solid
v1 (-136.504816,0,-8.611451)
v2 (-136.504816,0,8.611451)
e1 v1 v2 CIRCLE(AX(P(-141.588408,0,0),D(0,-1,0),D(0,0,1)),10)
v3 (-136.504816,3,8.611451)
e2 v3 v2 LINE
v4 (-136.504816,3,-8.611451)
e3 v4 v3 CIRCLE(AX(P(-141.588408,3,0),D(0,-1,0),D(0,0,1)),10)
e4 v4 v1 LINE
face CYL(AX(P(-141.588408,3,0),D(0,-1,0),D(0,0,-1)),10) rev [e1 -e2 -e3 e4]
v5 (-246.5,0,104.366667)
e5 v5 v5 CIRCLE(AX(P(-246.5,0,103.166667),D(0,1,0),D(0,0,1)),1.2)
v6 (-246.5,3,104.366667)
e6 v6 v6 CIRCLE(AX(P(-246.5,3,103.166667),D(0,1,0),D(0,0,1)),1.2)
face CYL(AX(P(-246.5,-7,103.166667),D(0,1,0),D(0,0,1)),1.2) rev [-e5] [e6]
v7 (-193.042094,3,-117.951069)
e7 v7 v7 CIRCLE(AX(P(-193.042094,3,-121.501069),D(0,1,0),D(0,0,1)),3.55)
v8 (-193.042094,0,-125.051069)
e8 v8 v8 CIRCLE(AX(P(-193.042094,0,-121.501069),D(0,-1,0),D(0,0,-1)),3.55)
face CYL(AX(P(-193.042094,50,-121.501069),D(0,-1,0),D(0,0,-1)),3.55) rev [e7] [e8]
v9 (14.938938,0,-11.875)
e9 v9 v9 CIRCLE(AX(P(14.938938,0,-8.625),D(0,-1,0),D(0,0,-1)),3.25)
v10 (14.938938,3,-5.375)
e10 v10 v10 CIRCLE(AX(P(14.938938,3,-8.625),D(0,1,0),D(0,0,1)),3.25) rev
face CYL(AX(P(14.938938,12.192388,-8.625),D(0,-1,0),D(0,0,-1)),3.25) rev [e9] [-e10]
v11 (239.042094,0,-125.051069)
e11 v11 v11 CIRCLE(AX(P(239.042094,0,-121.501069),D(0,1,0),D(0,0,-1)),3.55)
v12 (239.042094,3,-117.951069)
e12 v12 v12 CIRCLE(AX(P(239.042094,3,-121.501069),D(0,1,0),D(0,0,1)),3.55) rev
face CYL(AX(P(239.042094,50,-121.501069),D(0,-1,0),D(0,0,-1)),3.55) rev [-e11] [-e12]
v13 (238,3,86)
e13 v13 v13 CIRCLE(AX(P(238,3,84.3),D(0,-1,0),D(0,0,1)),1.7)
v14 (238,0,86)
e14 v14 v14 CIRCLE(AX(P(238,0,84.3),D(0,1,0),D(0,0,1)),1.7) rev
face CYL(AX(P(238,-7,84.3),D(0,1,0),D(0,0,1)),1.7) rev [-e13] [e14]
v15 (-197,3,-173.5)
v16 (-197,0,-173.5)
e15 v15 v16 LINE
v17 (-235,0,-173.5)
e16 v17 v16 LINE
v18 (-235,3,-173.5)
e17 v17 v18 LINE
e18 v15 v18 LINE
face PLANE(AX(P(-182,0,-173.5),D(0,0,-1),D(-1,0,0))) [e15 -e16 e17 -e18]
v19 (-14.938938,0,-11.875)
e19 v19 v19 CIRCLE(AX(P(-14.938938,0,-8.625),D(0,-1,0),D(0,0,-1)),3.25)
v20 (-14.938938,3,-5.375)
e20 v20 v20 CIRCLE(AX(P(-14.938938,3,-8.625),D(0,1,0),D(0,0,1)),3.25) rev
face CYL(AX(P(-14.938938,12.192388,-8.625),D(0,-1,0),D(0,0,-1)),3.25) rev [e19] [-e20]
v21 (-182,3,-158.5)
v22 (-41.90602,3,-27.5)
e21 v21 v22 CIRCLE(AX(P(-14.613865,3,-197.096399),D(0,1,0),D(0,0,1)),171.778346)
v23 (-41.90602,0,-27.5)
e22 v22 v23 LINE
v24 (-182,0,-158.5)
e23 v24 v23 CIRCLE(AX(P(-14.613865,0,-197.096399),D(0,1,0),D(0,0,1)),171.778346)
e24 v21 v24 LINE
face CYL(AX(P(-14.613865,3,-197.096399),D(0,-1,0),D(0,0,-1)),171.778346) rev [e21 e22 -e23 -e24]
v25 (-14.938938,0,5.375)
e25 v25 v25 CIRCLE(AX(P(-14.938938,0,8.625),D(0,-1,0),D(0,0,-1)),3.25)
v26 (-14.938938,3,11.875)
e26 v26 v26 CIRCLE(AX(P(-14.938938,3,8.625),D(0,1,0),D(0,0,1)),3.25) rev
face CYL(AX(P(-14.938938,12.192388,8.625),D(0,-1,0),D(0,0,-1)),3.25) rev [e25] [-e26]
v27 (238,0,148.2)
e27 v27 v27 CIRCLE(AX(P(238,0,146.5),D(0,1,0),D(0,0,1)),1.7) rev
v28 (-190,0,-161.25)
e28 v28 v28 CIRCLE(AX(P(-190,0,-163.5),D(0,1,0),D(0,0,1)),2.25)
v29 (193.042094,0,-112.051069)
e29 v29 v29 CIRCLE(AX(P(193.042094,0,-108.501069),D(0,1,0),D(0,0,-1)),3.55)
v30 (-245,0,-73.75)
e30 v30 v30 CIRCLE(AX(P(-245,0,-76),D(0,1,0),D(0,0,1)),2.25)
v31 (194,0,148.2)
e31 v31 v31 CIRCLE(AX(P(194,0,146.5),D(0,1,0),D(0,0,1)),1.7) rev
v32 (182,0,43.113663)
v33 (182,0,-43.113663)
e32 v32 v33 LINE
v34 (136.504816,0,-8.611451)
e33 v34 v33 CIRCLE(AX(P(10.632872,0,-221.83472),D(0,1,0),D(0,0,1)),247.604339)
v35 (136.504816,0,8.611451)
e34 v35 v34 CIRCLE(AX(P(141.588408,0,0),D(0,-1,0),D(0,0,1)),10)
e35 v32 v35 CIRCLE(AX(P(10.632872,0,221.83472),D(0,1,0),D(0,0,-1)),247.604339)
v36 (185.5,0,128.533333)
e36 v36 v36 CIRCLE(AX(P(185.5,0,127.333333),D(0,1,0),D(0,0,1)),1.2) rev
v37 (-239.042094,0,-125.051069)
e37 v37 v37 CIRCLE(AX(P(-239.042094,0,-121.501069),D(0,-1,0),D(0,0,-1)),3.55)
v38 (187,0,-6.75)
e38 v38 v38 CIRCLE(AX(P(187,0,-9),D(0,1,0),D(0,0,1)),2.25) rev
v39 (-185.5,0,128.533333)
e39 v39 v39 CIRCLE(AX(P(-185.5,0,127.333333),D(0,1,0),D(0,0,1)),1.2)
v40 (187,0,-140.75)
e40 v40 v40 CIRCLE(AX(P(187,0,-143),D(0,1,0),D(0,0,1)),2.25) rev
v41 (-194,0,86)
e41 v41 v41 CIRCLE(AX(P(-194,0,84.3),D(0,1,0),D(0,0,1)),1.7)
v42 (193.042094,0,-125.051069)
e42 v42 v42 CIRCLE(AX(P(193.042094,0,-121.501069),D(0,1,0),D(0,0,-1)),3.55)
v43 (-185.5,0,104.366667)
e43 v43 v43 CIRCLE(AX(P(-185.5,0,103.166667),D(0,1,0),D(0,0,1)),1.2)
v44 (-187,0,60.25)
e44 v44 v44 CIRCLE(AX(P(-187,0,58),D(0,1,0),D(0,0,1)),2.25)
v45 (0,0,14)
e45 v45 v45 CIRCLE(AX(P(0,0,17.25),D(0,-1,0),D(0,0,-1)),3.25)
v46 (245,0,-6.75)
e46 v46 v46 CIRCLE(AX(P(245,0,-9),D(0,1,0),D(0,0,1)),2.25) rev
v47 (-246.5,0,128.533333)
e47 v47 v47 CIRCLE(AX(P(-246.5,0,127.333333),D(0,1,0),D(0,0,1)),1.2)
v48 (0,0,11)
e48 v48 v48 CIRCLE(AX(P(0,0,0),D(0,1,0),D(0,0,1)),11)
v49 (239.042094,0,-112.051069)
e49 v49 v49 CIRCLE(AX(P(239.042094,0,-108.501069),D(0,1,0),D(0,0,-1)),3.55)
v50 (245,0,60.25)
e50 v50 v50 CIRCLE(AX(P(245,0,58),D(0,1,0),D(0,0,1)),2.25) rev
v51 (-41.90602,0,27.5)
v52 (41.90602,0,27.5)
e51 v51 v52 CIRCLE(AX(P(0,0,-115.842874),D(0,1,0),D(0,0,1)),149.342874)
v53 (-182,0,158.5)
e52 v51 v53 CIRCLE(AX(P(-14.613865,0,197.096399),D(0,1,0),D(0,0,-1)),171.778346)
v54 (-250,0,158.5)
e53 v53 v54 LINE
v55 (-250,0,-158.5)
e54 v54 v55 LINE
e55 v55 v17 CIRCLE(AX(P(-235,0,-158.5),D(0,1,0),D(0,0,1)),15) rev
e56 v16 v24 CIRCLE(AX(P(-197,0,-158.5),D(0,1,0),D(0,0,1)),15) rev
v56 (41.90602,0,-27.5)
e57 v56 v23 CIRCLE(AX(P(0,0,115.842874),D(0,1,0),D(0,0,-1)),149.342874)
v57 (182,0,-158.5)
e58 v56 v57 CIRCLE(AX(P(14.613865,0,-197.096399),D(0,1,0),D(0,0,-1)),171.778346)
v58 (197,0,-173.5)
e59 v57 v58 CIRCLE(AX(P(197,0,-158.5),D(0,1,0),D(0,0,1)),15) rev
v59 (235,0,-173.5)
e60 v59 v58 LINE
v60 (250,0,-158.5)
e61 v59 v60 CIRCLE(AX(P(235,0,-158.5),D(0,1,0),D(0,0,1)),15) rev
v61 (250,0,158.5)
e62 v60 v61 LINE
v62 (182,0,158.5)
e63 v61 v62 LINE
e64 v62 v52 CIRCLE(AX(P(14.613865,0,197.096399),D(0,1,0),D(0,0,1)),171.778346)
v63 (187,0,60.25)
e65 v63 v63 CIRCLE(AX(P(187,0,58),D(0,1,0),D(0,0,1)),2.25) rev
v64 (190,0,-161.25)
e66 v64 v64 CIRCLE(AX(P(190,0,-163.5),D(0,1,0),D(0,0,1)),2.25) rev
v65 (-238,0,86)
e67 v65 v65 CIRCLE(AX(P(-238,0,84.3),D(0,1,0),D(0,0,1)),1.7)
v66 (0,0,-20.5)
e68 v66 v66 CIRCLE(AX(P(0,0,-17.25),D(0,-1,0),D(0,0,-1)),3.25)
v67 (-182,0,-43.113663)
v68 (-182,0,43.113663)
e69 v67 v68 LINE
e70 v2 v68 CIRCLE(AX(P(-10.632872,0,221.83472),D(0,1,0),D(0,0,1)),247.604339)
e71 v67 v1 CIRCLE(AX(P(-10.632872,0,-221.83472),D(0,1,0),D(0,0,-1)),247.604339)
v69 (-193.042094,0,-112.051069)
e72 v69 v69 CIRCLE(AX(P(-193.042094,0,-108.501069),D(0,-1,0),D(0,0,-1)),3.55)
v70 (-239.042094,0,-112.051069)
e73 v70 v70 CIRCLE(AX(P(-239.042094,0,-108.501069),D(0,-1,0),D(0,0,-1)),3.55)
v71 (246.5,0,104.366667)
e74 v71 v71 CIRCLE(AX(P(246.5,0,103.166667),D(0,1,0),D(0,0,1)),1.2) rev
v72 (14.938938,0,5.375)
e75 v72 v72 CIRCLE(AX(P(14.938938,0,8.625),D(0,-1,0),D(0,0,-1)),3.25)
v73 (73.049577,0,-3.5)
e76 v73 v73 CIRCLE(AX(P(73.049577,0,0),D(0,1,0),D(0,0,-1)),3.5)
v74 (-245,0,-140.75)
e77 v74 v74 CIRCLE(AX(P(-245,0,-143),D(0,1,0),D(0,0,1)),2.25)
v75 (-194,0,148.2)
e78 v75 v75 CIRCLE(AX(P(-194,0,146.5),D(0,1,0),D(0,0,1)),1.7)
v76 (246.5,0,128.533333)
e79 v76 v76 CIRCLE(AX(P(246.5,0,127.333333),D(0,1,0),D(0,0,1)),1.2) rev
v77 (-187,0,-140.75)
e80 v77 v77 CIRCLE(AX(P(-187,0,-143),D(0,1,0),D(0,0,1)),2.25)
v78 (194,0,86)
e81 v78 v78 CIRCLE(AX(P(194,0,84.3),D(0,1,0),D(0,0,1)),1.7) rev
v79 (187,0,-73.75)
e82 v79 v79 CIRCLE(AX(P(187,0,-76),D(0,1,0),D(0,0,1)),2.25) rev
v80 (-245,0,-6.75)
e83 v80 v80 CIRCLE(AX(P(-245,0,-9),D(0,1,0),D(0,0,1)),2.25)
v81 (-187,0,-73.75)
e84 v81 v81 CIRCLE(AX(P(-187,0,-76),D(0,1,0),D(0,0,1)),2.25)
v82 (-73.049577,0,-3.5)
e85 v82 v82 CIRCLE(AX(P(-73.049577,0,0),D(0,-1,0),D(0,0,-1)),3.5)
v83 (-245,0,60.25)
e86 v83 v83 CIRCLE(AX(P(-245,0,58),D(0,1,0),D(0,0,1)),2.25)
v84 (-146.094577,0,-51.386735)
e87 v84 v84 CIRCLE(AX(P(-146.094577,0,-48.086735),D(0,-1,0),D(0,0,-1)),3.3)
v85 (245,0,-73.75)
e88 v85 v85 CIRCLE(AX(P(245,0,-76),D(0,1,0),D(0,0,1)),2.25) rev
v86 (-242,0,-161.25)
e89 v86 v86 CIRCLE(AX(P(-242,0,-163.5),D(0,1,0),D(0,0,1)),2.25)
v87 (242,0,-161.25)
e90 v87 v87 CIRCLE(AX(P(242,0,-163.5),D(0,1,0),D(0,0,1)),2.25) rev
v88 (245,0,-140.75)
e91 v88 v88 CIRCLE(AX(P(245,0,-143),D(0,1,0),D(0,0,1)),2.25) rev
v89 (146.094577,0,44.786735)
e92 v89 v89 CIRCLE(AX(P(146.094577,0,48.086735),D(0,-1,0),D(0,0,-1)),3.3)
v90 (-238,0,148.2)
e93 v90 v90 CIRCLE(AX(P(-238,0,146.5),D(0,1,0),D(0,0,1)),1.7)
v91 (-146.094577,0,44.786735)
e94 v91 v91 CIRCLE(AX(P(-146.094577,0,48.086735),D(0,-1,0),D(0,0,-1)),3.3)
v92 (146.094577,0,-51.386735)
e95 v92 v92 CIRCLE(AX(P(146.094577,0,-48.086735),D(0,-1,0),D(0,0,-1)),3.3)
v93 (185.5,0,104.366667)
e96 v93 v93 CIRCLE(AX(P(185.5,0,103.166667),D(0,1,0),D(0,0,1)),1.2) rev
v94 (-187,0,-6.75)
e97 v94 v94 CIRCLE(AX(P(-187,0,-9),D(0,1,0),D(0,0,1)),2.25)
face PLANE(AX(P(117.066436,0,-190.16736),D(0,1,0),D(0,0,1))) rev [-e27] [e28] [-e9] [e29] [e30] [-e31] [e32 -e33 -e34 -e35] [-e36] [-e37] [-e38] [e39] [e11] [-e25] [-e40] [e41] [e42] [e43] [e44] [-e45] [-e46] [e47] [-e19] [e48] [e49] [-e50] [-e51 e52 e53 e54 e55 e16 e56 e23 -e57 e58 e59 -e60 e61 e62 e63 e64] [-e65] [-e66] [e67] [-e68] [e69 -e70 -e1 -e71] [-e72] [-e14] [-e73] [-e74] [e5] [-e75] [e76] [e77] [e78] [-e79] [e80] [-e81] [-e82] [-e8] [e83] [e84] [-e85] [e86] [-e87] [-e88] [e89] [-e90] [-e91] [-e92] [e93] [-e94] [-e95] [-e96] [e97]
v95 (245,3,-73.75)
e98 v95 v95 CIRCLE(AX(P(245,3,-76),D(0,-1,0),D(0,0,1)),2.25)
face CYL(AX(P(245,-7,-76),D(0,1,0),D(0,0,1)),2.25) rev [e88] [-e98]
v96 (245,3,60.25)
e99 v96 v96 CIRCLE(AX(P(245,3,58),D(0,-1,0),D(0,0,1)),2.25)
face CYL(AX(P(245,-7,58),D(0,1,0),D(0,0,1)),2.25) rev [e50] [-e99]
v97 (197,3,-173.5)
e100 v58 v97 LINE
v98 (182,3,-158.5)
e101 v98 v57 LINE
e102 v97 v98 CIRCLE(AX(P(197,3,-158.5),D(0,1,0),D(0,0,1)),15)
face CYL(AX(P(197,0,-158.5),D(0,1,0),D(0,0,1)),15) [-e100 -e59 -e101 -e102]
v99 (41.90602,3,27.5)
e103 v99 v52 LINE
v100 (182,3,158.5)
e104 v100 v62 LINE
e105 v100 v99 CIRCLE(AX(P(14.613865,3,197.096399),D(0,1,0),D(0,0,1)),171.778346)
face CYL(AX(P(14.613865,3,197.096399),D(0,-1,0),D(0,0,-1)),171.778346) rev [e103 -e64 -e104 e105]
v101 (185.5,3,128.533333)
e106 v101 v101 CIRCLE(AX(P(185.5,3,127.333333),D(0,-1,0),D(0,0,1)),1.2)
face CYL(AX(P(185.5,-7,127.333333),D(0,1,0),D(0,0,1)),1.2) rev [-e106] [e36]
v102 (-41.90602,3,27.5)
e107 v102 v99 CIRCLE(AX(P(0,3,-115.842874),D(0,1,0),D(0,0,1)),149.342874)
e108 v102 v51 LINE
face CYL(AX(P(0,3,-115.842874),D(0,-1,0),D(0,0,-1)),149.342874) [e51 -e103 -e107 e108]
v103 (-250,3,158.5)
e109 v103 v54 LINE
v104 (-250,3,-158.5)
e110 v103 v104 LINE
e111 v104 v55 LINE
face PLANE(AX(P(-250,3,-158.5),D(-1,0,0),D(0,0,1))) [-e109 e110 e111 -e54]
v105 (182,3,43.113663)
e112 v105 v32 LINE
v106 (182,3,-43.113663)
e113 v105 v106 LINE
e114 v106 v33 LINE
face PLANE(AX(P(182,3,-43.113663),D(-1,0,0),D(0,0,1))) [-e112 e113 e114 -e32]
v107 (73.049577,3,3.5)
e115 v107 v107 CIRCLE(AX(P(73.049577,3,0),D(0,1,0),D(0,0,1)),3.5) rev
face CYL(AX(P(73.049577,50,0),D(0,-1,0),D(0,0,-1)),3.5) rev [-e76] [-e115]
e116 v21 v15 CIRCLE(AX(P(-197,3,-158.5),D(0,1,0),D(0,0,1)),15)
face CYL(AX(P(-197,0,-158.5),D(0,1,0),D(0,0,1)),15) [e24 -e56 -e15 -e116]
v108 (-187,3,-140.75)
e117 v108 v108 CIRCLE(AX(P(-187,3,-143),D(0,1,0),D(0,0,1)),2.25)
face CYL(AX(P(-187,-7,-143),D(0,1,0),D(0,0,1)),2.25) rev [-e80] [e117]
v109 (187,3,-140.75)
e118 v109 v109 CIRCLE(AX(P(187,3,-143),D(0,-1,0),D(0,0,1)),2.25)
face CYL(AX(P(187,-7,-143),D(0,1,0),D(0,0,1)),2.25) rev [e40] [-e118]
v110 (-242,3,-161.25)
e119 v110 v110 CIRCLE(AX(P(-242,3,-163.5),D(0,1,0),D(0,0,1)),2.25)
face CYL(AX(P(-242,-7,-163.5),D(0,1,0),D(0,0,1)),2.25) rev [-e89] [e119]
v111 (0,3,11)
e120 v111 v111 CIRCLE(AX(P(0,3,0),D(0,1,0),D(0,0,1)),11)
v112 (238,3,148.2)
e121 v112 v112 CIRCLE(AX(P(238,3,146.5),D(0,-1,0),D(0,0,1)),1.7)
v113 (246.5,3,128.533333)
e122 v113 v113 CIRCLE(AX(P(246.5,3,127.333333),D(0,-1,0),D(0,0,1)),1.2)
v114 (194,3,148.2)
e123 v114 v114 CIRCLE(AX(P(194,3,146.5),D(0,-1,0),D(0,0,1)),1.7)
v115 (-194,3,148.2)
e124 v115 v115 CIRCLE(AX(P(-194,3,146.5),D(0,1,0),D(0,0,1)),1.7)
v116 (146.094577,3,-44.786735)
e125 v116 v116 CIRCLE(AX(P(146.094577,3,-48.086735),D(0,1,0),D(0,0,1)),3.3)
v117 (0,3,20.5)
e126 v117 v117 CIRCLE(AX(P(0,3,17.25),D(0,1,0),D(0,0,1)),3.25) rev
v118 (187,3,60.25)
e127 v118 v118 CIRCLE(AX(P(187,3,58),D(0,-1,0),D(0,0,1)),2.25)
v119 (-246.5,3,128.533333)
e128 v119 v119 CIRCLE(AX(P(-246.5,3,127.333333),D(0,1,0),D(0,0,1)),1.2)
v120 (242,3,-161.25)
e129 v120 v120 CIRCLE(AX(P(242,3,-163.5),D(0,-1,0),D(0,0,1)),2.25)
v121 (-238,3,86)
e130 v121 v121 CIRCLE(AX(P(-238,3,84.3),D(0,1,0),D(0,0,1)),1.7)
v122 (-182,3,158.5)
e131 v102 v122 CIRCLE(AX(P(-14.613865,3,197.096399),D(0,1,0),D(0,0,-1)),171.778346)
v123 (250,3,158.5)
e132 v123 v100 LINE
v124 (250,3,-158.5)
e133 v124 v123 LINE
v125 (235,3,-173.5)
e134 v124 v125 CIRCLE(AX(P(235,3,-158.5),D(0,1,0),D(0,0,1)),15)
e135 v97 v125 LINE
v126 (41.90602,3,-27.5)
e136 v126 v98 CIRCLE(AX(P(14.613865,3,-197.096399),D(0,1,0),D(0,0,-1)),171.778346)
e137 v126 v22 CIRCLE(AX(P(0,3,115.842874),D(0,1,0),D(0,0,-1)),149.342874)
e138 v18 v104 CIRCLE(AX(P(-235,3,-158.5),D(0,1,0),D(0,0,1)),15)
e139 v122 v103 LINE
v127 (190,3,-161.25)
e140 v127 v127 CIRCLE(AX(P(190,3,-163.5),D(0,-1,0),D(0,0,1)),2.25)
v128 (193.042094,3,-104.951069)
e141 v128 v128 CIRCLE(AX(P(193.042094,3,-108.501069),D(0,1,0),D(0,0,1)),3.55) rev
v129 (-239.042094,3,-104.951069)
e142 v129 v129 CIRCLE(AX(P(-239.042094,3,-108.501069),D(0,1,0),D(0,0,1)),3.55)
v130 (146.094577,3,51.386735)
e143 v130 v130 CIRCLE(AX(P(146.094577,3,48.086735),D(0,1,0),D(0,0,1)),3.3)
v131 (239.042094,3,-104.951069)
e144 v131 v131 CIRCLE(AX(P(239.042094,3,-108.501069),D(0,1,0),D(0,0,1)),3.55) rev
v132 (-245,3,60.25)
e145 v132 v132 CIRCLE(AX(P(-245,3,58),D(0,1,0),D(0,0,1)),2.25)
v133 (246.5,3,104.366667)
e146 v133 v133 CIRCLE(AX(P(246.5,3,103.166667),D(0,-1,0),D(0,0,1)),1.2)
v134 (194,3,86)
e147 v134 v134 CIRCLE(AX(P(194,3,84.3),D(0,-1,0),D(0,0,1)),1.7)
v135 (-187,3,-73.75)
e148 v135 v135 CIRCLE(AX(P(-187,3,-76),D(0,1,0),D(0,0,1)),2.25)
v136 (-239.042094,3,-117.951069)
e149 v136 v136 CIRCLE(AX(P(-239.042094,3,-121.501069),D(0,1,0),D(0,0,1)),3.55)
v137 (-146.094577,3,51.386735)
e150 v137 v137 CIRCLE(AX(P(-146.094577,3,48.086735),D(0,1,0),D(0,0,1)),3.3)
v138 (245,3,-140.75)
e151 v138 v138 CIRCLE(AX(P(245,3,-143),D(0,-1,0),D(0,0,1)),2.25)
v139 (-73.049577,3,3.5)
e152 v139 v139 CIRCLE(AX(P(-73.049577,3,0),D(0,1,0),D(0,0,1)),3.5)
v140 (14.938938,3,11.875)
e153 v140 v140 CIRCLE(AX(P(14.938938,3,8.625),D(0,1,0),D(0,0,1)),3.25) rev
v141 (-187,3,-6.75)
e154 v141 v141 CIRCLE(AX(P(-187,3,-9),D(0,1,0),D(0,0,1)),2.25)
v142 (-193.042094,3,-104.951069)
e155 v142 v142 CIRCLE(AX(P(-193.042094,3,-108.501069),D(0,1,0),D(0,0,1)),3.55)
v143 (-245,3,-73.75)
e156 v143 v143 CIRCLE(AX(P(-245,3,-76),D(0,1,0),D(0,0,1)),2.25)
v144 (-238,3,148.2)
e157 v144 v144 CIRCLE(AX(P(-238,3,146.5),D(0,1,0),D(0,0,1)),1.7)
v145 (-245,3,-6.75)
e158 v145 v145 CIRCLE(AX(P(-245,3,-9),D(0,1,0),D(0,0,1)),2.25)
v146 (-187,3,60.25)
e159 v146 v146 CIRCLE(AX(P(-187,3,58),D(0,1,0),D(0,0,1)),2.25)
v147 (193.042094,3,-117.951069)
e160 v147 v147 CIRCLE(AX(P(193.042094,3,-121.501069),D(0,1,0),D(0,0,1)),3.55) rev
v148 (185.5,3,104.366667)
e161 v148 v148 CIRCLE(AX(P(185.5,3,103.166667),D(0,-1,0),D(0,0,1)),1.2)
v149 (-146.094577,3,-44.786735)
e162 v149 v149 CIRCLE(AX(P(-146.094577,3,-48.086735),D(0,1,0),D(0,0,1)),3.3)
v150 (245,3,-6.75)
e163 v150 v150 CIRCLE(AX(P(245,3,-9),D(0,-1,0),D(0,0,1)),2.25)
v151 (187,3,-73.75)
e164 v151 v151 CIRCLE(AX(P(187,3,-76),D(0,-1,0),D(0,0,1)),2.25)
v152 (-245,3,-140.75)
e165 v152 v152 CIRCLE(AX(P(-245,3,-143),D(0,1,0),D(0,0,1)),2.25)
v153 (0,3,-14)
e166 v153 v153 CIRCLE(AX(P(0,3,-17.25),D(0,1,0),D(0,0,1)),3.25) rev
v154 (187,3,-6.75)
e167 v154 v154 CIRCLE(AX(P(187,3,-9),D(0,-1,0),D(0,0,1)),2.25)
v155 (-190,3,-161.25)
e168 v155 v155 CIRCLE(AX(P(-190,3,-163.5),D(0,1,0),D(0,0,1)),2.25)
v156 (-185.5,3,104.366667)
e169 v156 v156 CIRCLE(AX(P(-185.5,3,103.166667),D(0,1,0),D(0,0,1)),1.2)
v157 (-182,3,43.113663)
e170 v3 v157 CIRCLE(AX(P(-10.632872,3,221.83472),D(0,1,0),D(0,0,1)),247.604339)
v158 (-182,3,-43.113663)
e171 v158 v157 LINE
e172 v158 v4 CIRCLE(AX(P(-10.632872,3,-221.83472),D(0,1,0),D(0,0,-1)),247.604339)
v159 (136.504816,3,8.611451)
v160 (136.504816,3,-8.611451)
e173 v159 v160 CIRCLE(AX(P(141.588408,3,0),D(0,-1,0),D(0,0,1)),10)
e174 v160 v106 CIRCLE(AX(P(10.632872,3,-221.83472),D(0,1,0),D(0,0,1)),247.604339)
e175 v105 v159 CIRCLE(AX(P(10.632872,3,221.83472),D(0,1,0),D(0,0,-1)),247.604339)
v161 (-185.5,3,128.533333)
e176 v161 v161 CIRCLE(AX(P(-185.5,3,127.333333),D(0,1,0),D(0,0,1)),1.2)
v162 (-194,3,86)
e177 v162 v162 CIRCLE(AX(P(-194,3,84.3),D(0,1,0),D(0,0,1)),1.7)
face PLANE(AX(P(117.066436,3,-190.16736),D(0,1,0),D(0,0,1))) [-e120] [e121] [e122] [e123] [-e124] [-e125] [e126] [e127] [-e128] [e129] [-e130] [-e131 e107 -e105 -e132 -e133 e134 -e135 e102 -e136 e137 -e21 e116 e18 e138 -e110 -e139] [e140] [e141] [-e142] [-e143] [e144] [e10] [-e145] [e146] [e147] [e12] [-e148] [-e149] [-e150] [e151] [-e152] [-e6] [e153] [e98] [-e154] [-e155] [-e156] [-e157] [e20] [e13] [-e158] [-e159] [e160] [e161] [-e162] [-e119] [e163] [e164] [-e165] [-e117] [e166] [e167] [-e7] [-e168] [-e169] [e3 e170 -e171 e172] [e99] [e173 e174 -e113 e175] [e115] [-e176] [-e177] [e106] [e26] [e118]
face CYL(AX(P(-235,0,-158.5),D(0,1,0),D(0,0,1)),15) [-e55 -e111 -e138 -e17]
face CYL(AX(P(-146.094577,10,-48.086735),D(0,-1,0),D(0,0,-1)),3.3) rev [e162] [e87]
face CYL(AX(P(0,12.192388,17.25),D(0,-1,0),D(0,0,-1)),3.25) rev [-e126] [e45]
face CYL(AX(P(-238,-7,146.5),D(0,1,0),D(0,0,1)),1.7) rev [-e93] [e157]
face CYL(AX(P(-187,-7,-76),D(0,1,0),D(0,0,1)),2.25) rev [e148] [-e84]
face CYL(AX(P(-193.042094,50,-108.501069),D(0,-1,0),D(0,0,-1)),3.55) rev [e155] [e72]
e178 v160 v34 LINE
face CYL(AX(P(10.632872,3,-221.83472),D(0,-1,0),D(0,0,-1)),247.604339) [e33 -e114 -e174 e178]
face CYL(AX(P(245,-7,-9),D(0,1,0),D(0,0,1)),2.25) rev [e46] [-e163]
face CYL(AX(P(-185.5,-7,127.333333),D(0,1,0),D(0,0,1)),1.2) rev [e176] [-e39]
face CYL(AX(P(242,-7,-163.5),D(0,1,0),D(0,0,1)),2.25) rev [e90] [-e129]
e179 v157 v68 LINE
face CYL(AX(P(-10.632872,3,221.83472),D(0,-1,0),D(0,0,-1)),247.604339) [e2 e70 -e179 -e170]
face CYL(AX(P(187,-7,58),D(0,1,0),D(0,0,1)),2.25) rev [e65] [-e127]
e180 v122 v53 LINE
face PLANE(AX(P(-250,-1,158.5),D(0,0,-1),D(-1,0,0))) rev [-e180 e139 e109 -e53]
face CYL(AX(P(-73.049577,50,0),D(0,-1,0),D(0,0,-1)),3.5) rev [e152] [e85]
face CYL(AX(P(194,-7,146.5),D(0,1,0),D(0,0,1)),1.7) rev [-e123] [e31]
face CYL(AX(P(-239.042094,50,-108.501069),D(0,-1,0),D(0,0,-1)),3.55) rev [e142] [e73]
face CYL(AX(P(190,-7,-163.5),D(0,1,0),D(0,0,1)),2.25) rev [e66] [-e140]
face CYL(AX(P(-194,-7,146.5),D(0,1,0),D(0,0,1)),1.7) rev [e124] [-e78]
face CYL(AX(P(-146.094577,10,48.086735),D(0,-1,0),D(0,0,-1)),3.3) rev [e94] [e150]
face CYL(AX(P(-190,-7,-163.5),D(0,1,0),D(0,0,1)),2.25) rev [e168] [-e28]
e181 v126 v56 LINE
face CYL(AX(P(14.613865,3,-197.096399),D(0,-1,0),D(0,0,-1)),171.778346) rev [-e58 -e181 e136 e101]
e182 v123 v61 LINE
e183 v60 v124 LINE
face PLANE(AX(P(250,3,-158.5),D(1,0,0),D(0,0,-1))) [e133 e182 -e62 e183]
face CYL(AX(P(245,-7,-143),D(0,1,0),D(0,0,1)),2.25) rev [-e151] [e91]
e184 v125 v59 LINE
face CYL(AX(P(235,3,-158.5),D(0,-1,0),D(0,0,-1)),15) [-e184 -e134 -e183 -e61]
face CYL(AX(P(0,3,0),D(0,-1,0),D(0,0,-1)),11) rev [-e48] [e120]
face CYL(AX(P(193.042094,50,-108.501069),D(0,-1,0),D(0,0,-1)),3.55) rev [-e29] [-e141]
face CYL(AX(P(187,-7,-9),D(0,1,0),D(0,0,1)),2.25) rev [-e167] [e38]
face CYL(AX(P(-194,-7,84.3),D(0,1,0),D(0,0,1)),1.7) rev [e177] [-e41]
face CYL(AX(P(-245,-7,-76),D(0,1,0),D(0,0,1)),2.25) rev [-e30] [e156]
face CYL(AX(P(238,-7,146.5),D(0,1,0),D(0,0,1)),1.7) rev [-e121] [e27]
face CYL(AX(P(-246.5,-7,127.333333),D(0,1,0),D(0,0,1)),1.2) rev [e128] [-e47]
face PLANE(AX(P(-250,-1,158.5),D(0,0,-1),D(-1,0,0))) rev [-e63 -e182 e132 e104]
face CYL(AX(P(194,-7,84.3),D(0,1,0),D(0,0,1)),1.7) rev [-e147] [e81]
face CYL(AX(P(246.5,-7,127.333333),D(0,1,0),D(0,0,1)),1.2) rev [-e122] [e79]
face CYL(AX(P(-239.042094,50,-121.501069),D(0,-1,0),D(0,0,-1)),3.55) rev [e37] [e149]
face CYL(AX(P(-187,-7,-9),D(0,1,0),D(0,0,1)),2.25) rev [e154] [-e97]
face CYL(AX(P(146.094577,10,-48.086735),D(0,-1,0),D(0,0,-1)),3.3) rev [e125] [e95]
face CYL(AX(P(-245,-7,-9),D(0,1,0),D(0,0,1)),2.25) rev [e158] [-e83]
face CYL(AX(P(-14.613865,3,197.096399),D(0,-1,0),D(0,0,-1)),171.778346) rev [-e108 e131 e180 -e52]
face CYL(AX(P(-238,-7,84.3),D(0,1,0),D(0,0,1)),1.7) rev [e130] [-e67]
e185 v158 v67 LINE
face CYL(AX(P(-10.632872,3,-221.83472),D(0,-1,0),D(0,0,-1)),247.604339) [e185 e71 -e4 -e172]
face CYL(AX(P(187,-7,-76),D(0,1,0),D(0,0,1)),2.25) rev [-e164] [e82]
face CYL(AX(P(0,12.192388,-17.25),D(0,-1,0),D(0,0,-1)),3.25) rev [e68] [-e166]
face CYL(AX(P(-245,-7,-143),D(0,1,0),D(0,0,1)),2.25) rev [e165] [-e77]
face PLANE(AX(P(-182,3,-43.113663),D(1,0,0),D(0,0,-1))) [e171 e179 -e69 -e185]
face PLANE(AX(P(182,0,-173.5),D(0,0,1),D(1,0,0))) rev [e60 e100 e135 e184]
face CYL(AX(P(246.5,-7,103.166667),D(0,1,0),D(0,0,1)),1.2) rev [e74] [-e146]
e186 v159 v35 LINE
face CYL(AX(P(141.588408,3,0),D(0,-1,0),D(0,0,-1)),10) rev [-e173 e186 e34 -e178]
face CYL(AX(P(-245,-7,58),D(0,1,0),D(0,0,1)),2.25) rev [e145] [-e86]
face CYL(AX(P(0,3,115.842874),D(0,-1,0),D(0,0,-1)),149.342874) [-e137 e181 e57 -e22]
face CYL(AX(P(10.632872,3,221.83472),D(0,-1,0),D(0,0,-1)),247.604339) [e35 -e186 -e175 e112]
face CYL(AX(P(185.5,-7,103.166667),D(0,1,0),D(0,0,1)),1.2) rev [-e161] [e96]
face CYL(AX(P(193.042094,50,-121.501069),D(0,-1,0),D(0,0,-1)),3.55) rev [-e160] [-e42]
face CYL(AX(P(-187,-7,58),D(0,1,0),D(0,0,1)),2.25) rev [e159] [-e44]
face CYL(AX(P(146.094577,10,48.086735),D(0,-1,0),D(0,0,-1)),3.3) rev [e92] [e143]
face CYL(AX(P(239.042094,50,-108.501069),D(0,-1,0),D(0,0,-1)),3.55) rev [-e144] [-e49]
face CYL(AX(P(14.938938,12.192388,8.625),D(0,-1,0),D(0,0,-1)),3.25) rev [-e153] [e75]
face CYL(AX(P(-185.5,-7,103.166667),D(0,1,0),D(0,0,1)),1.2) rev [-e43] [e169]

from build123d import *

# Parameters (mm, degrees)
SKETCH1_R           = 6.35
SKETCH1_R_2         = 11
BOSS_EXTRUDE1_DEPTH = 3
SKETCH3_W           = 515.59682947
SKETCH3_H           = 41.835114591
SKETCH3_H_2         = 39.78804392
CUT_EXTRUDE1_DEPTH  = 4
BOSS_EXTRUDE2_DEPTH = 3
BOSS_EXTRUDE3_DEPTH = 3
FILLET3_R           = 15
SKETCH13_R          = 1.2
SKETCH13_R_2        = 2.25
CUT_EXTRUDE2_DEPTH  = 10
SKETCH14_R          = 1.7
CUT_EXTRUDE3_DEPTH  = 10
BOSS_EXTRUDE5_START = -3
SKETCH16_R          = 6.35
BOSS_EXTRUDE5_DEPTH = 3
SKETCH17_R          = 2.5
CUT_EXTRUDE4_DEPTH  = 10
SKETCH18_R          = 6.35
BOSS_EXTRUDE6_DEPTH = 3
SKETCH19_R          = 3.3
CUT_EXTRUDE5_DEPTH  = 10
SKETCH20_R          = 3.55
CUT_EXTRUDE6_DEPTH  = 50
SKETCH21_R          = 3.5
CUT_EXTRUDE7_DEPTH  = 50
BOSS_EXTRUDE7_START = -3
SKETCH22_R          = 2.5
BOSS_EXTRUDE7_DEPTH = 3
SKETCH23_R          = 3.25
CUT_EXTRUDE8_DEPTH  = 3


with BuildPart() as part:
    # Sketch1 → Boss-Extrude1 (new body)
    with BuildSketch(Plane(origin=(0, 0, 0), x_dir=(1, 0, 0), z_dir=(0, 1, 0))):
        with BuildLine():
            ThreePointArc((-41.906019658, -27.5), (-137.644967441, -71.462113616), (-197, -158.5))
            ThreePointArc((-197, -158.5), (-223.5, -185), (-250, -158.5))
            ThreePointArc((-250, -158.5), (-208.03231281, -72.364423731), (-136.504816256, -8.61145122))
            ThreePointArc((-136.504816256, -8.61145122), (-131.588408281, 0), (-136.504816256, 8.61145122))
            ThreePointArc((-136.504816256, 8.61145122), (-208.03231281, 72.364423731), (-250, 158.5))
            ThreePointArc((-250, 158.5), (-223.5, 185), (-197, 158.5))
            ThreePointArc((-197, 158.5), (-137.644967441, 71.462113616), (-41.906019658, 27.5))
            ThreePointArc((-41.906019658, 27.5), (0, 33.5), (41.906019658, 27.5))
            ThreePointArc((41.906019658, 27.5), (137.644967441, 71.462113616), (197, 158.5))
            ThreePointArc((197, 158.5), (223.5, 185), (250, 158.5))
            ThreePointArc((250, 158.5), (208.03231281, 72.364423731), (136.504816256, 8.61145122))
            ThreePointArc((136.504816256, 8.61145122), (131.588408281, 0), (136.504816256, -8.61145122))
            ThreePointArc((136.504816256, -8.61145122), (208.03231281, -72.364423731), (250, -158.5))
            ThreePointArc((250, -158.5), (223.5, -185), (197, -158.5))
            ThreePointArc((197, -158.5), (137.644967441, -71.462113616), (41.906019658, -27.5))
            ThreePointArc((41.906019658, -27.5), (0, -33.5), (-41.906019658, -27.5))
        make_face()
        with Locations(Location((39.6, 0, 0), (0, 0, 270))):
            Circle(SKETCH1_R, mode=Mode.SUBTRACT)
        with Locations(Location((-39.6, 0, 0), (0, 0, 90))):
            Circle(SKETCH1_R, mode=Mode.SUBTRACT)
        with Locations(Location((0, 0, 0), (0, 0, 270))):
            Circle(SKETCH1_R_2, mode=Mode.SUBTRACT)
    extrude(amount=BOSS_EXTRUDE1_DEPTH)

    # Sketch3 → Cut-Extrude1 (cut)
    with BuildSketch(Plane(origin=(0, 3, 0), x_dir=(1, 0, 0), z_dir=(0, 1, 0))):
        with Locations((7.798414735, 179.417557295)):
            Rectangle(SKETCH3_W, SKETCH3_H)
        with Locations((7.798414735, -178.39402196)):
            Rectangle(SKETCH3_W, SKETCH3_H_2)
    extrude(amount=-CUT_EXTRUDE1_DEPTH, mode=Mode.SUBTRACT)

    # Sketch8 → Boss-Extrude2 (add)
    with BuildSketch(Plane.XZ):
        with BuildLine():
            Line((-250, -158.5), (-250, 158.5))
            ThreePointArc((-250, 158.5), (-223.949910555, 96.121754218), (-182, 43.113663219))
            Line((-182, 43.113663219), (-182, -43.113663219))
            ThreePointArc((-182, -43.113663219), (-223.949910555, -96.121754218), (-250, -158.5))
        make_face()
        with BuildLine():
            Line((-197, -158.5), (-182, -158.5))
            ThreePointArc((-182, -158.5), (-131.938879854, -71.626716928), (-41.906019658, -27.5))
            ThreePointArc((-41.906019658, -27.5), (-137.644967441, -71.462113616), (-197, -158.5))
        make_face()
        with BuildLine():
            Line((250, -158.5), (250, 158.5))
            ThreePointArc((250, 158.5), (223.949910555, 96.121754218), (182, 43.113663219))
            Line((182, 43.113663219), (182, -43.113663219))
            ThreePointArc((182, -43.113663219), (223.949910555, -96.121754218), (250, -158.5))
        make_face()
        with BuildLine():
            Line((-197, 158.5), (-182, 158.5))
            ThreePointArc((-182, 158.5), (-131.938879854, 71.626716928), (-41.906019658, 27.5))
            ThreePointArc((-41.906019658, 27.5), (-137.644967441, 71.462113616), (-197, 158.5))
        make_face()
        with BuildLine():
            Line((197, 158.5), (182, 158.5))
            ThreePointArc((182, 158.5), (131.938879854, 71.626716928), (41.906019658, 27.5))
            ThreePointArc((41.906019658, 27.5), (137.644967441, 71.462113616), (197, 158.5))
        make_face()
        with BuildLine():
            Line((197, -158.5), (182, -158.5))
            ThreePointArc((182, -158.5), (131.938879854, -71.626716928), (41.906019658, -27.5))
            ThreePointArc((41.906019658, -27.5), (137.644967441, -71.462113616), (197, -158.5))
        make_face()
    extrude(amount=-BOSS_EXTRUDE2_DEPTH)

    # Sketch11 → Boss-Extrude3 (add)
    with BuildSketch(Plane(origin=(0, 3, 0), x_dir=(1, 0, 0), z_dir=(0, 1, 0))):
        Polygon((250, 158.5), (250, 173.5), (184.763828731, 173.5), (182, 173.5), (182, 158.5), align=None)
        Polygon((-182, 173.5), (-184.763828731, 173.5), (-250, 173.5), (-250, 158.5), (-182, 158.5), align=None)
    extrude(amount=-BOSS_EXTRUDE3_DEPTH)

    # Fillet3
    fillet3_edges = [part.edges().sort_by_distance(p)[0] for p in [
        (250, 1.5, -173.5),
        (182, 1.5, -173.5),
        (-182, 1.5, -173.5),
        (-250, 1.5, -173.5),
    ]]
    fillet(fillet3_edges, radius=FILLET3_R - 0.0001)  # a hair under: the kernel refuses the full size

    # Sketch13 → Cut-Extrude2 (cut)
    with BuildSketch(Plane(origin=(0, 3, 0), x_dir=(1, 0, 0), z_dir=(0, 1, 0))):
        with Locations(Location((-185.5, -127.333333333, 0), (0, 0, 270))):
            Circle(SKETCH13_R)
        with Locations(Location((-185.5, -103.166666667, 0), (0, 0, 270))):
            Circle(SKETCH13_R)
        with Locations(Location((-246.5, -103.166666667, 0), (0, 0, 270))):
            Circle(SKETCH13_R)
        with Locations(Location((-246.5, -127.333333333, 0), (0, 0, 270))):
            Circle(SKETCH13_R)
        with Locations(Location((-187, -58, 0), (0, 0, 270))):
            Circle(SKETCH13_R_2)
        with Locations(Location((-187, 9, 0), (0, 0, 270))):
            Circle(SKETCH13_R_2)
        with Locations(Location((-187, 76, 0), (0, 0, 270))):
            Circle(SKETCH13_R_2)
        with Locations(Location((-187, 143, 0), (0, 0, 270))):
            Circle(SKETCH13_R_2)
        with Locations(Location((-245, 143, 0), (0, 0, 270))):
            Circle(SKETCH13_R_2)
        with Locations(Location((-245, 76, 0), (0, 0, 270))):
            Circle(SKETCH13_R_2)
        with Locations(Location((-245, 9, 0), (0, 0, 270))):
            Circle(SKETCH13_R_2)
        with Locations(Location((-245, -58, 0), (0, 0, 270))):
            Circle(SKETCH13_R_2)
        with Locations(Location((-242, 163.5, 0), (0, 0, 270))):
            Circle(SKETCH13_R_2)
        with Locations(Location((-190, 163.5, 0), (0, 0, 270))):
            Circle(SKETCH13_R_2)
    cut_extrude2 = extrude(amount=-CUT_EXTRUDE2_DEPTH, mode=Mode.SUBTRACT)

    # Sketch14 → Cut-Extrude3 (cut)
    with BuildSketch(Plane(origin=(0, 3, 0), x_dir=(1, 0, 0), z_dir=(0, 1, 0))):
        with Locations(Location((-194, -146.5, 0), (0, 0, 270))):
            Circle(SKETCH14_R)
        with Locations(Location((-238, -146.5, 0), (0, 0, 270))):
            Circle(SKETCH14_R)
        with Locations(Location((-194, -84.3, 0), (0, 0, 270))):
            Circle(SKETCH14_R)
        with Locations(Location((-238, -84.3, 0), (0, 0, 270))):
            Circle(SKETCH14_R)
    cut_extrude3 = extrude(amount=-CUT_EXTRUDE3_DEPTH, mode=Mode.SUBTRACT)

    # Mirror4: Cut-Extrude2, Cut-Extrude3 across plane
    add(cut_extrude2.mirror(Plane(origin=(0, 0, 0), x_dir=(0, 0, 1), z_dir=(1, 0, 0))), mode=Mode.SUBTRACT)
    add(cut_extrude3.mirror(Plane(origin=(0, 0, 0), x_dir=(0, 0, 1), z_dir=(1, 0, 0))), mode=Mode.SUBTRACT)

    # Sketch16 → Boss-Extrude5 (add)
    with BuildSketch(Plane(origin=(0, 3, 0), x_dir=(1, 0, 0), z_dir=(0, 1, 0)).offset(BOSS_EXTRUDE5_START)):
        with Locations((-39.6, 0)):
            Circle(SKETCH16_R)
        with Locations((39.6, 0)):
            Circle(SKETCH16_R)
    extrude(amount=BOSS_EXTRUDE5_DEPTH)

    # Sketch17 → Cut-Extrude4 (cut)
    with BuildSketch(Plane(origin=(0, 3, 0), x_dir=(1, 0, 0), z_dir=(0, 1, 0))):
        with Locations(Location((0, 19, 0), (0, 0, 270))):
            Circle(SKETCH17_R)
        with Locations(Location((19, 0, 0), (0, 0, 270))):
            Circle(SKETCH17_R)
        with Locations(Location((0, -19, 0), (0, 0, 270))):
            Circle(SKETCH17_R)
        with Locations(Location((-19, 0, 0), (0, 0, 270))):
            Circle(SKETCH17_R)
    extrude(amount=-CUT_EXTRUDE4_DEPTH, mode=Mode.SUBTRACT)

    # Sketch18 → Boss-Extrude6 (add)
    with BuildSketch(Plane.XZ):
        with Locations((-39.6, 0)):
            Circle(SKETCH18_R)
        with Locations((39.6, 0)):
            Circle(SKETCH18_R)
    extrude(amount=-BOSS_EXTRUDE6_DEPTH)

    # Sketch19 → Cut-Extrude5 (cut)
    with BuildSketch(Plane.XZ):
        with Locations(Location((-146.094577254, 48.086735474, 0), (0, 0, 270))):
            Circle(SKETCH19_R)
        with Locations(Location((146.094577254, 48.086735474, 0), (0, 0, 270))):
            Circle(SKETCH19_R)
        with Locations(Location((146.094577254, -48.086735474, 0), (0, 0, 270))):
            Circle(SKETCH19_R)
        with Locations(Location((-146.094577254, -48.086735474, 0), (0, 0, 270))):
            Circle(SKETCH19_R)
    extrude(amount=-CUT_EXTRUDE5_DEPTH, mode=Mode.SUBTRACT)

    # Sketch20 → Cut-Extrude6 (cut)
    with BuildSketch(Plane.XZ):
        with Locations(Location((-239.042094399, -108.501069067, 0), (0, 0, 270))):
            Circle(SKETCH20_R)
        with Locations(Location((-239.042094399, -121.501069067, 0), (0, 0, 270))):
            Circle(SKETCH20_R)
        with Locations(Location((-193.042094399, -108.501069067, 0), (0, 0, 270))):
            Circle(SKETCH20_R)
        with Locations(Location((-193.042094399, -121.501069067, 0), (0, 0, 270))):
            Circle(SKETCH20_R)
    cut_extrude6 = extrude(amount=-CUT_EXTRUDE6_DEPTH, mode=Mode.SUBTRACT)

    # Mirror5: Cut-Extrude6 across plane
    add(cut_extrude6.mirror(Plane(origin=(0, 0, 0), x_dir=(0, 0, 1), z_dir=(1, 0, 0))), mode=Mode.SUBTRACT)

    # Sketch21 → Cut-Extrude7 (cut)
    with BuildSketch(Plane.XZ):
        with Locations(Location((-73.049577254, 0, 0), (0, 0, 270))):
            Circle(SKETCH21_R)
    cut_extrude7 = extrude(amount=-CUT_EXTRUDE7_DEPTH, mode=Mode.SUBTRACT)

    # Mirror6: Cut-Extrude7 across plane
    add(cut_extrude7.mirror(Plane(origin=(0, 0, 0), x_dir=(0, 0, 1), z_dir=(1, 0, 0))), mode=Mode.SUBTRACT)

    # Sketch22 → Boss-Extrude7 (add)
    with BuildSketch(Plane.XZ.offset(BOSS_EXTRUDE7_START)):
        with Locations((0, -19)):
            Circle(SKETCH22_R)
        with Locations((-19, 0)):
            Circle(SKETCH22_R)
        with Locations((0, 19)):
            Circle(SKETCH22_R)
        with Locations((19, 0)):
            Circle(SKETCH22_R)
    extrude(amount=BOSS_EXTRUDE7_DEPTH)

    # Sketch23 → Cut-Extrude8 (cut)
    with BuildSketch(Plane.XZ):
        with Locations(Location((0, 17.25, 0), (0, 0, 270))):
            Circle(SKETCH23_R)
        with Locations(Location((14.938938215, 8.625, 0), (0, 0, 270))):
            Circle(SKETCH23_R)
        with Locations(Location((14.938938215, -8.625, 0), (0, 0, 270))):
            Circle(SKETCH23_R)
        with Locations(Location((0, -17.25, 0), (0, 0, 270))):
            Circle(SKETCH23_R)
        with Locations(Location((-14.938938215, -8.625, 0), (0, 0, 270))):
            Circle(SKETCH23_R)
        with Locations(Location((-14.938938215, 8.625, 0), (0, 0, 270))):
            Circle(SKETCH23_R)
    extrude(amount=-CUT_EXTRUDE8_DEPTH, mode=Mode.SUBTRACT)


solid = part.part
